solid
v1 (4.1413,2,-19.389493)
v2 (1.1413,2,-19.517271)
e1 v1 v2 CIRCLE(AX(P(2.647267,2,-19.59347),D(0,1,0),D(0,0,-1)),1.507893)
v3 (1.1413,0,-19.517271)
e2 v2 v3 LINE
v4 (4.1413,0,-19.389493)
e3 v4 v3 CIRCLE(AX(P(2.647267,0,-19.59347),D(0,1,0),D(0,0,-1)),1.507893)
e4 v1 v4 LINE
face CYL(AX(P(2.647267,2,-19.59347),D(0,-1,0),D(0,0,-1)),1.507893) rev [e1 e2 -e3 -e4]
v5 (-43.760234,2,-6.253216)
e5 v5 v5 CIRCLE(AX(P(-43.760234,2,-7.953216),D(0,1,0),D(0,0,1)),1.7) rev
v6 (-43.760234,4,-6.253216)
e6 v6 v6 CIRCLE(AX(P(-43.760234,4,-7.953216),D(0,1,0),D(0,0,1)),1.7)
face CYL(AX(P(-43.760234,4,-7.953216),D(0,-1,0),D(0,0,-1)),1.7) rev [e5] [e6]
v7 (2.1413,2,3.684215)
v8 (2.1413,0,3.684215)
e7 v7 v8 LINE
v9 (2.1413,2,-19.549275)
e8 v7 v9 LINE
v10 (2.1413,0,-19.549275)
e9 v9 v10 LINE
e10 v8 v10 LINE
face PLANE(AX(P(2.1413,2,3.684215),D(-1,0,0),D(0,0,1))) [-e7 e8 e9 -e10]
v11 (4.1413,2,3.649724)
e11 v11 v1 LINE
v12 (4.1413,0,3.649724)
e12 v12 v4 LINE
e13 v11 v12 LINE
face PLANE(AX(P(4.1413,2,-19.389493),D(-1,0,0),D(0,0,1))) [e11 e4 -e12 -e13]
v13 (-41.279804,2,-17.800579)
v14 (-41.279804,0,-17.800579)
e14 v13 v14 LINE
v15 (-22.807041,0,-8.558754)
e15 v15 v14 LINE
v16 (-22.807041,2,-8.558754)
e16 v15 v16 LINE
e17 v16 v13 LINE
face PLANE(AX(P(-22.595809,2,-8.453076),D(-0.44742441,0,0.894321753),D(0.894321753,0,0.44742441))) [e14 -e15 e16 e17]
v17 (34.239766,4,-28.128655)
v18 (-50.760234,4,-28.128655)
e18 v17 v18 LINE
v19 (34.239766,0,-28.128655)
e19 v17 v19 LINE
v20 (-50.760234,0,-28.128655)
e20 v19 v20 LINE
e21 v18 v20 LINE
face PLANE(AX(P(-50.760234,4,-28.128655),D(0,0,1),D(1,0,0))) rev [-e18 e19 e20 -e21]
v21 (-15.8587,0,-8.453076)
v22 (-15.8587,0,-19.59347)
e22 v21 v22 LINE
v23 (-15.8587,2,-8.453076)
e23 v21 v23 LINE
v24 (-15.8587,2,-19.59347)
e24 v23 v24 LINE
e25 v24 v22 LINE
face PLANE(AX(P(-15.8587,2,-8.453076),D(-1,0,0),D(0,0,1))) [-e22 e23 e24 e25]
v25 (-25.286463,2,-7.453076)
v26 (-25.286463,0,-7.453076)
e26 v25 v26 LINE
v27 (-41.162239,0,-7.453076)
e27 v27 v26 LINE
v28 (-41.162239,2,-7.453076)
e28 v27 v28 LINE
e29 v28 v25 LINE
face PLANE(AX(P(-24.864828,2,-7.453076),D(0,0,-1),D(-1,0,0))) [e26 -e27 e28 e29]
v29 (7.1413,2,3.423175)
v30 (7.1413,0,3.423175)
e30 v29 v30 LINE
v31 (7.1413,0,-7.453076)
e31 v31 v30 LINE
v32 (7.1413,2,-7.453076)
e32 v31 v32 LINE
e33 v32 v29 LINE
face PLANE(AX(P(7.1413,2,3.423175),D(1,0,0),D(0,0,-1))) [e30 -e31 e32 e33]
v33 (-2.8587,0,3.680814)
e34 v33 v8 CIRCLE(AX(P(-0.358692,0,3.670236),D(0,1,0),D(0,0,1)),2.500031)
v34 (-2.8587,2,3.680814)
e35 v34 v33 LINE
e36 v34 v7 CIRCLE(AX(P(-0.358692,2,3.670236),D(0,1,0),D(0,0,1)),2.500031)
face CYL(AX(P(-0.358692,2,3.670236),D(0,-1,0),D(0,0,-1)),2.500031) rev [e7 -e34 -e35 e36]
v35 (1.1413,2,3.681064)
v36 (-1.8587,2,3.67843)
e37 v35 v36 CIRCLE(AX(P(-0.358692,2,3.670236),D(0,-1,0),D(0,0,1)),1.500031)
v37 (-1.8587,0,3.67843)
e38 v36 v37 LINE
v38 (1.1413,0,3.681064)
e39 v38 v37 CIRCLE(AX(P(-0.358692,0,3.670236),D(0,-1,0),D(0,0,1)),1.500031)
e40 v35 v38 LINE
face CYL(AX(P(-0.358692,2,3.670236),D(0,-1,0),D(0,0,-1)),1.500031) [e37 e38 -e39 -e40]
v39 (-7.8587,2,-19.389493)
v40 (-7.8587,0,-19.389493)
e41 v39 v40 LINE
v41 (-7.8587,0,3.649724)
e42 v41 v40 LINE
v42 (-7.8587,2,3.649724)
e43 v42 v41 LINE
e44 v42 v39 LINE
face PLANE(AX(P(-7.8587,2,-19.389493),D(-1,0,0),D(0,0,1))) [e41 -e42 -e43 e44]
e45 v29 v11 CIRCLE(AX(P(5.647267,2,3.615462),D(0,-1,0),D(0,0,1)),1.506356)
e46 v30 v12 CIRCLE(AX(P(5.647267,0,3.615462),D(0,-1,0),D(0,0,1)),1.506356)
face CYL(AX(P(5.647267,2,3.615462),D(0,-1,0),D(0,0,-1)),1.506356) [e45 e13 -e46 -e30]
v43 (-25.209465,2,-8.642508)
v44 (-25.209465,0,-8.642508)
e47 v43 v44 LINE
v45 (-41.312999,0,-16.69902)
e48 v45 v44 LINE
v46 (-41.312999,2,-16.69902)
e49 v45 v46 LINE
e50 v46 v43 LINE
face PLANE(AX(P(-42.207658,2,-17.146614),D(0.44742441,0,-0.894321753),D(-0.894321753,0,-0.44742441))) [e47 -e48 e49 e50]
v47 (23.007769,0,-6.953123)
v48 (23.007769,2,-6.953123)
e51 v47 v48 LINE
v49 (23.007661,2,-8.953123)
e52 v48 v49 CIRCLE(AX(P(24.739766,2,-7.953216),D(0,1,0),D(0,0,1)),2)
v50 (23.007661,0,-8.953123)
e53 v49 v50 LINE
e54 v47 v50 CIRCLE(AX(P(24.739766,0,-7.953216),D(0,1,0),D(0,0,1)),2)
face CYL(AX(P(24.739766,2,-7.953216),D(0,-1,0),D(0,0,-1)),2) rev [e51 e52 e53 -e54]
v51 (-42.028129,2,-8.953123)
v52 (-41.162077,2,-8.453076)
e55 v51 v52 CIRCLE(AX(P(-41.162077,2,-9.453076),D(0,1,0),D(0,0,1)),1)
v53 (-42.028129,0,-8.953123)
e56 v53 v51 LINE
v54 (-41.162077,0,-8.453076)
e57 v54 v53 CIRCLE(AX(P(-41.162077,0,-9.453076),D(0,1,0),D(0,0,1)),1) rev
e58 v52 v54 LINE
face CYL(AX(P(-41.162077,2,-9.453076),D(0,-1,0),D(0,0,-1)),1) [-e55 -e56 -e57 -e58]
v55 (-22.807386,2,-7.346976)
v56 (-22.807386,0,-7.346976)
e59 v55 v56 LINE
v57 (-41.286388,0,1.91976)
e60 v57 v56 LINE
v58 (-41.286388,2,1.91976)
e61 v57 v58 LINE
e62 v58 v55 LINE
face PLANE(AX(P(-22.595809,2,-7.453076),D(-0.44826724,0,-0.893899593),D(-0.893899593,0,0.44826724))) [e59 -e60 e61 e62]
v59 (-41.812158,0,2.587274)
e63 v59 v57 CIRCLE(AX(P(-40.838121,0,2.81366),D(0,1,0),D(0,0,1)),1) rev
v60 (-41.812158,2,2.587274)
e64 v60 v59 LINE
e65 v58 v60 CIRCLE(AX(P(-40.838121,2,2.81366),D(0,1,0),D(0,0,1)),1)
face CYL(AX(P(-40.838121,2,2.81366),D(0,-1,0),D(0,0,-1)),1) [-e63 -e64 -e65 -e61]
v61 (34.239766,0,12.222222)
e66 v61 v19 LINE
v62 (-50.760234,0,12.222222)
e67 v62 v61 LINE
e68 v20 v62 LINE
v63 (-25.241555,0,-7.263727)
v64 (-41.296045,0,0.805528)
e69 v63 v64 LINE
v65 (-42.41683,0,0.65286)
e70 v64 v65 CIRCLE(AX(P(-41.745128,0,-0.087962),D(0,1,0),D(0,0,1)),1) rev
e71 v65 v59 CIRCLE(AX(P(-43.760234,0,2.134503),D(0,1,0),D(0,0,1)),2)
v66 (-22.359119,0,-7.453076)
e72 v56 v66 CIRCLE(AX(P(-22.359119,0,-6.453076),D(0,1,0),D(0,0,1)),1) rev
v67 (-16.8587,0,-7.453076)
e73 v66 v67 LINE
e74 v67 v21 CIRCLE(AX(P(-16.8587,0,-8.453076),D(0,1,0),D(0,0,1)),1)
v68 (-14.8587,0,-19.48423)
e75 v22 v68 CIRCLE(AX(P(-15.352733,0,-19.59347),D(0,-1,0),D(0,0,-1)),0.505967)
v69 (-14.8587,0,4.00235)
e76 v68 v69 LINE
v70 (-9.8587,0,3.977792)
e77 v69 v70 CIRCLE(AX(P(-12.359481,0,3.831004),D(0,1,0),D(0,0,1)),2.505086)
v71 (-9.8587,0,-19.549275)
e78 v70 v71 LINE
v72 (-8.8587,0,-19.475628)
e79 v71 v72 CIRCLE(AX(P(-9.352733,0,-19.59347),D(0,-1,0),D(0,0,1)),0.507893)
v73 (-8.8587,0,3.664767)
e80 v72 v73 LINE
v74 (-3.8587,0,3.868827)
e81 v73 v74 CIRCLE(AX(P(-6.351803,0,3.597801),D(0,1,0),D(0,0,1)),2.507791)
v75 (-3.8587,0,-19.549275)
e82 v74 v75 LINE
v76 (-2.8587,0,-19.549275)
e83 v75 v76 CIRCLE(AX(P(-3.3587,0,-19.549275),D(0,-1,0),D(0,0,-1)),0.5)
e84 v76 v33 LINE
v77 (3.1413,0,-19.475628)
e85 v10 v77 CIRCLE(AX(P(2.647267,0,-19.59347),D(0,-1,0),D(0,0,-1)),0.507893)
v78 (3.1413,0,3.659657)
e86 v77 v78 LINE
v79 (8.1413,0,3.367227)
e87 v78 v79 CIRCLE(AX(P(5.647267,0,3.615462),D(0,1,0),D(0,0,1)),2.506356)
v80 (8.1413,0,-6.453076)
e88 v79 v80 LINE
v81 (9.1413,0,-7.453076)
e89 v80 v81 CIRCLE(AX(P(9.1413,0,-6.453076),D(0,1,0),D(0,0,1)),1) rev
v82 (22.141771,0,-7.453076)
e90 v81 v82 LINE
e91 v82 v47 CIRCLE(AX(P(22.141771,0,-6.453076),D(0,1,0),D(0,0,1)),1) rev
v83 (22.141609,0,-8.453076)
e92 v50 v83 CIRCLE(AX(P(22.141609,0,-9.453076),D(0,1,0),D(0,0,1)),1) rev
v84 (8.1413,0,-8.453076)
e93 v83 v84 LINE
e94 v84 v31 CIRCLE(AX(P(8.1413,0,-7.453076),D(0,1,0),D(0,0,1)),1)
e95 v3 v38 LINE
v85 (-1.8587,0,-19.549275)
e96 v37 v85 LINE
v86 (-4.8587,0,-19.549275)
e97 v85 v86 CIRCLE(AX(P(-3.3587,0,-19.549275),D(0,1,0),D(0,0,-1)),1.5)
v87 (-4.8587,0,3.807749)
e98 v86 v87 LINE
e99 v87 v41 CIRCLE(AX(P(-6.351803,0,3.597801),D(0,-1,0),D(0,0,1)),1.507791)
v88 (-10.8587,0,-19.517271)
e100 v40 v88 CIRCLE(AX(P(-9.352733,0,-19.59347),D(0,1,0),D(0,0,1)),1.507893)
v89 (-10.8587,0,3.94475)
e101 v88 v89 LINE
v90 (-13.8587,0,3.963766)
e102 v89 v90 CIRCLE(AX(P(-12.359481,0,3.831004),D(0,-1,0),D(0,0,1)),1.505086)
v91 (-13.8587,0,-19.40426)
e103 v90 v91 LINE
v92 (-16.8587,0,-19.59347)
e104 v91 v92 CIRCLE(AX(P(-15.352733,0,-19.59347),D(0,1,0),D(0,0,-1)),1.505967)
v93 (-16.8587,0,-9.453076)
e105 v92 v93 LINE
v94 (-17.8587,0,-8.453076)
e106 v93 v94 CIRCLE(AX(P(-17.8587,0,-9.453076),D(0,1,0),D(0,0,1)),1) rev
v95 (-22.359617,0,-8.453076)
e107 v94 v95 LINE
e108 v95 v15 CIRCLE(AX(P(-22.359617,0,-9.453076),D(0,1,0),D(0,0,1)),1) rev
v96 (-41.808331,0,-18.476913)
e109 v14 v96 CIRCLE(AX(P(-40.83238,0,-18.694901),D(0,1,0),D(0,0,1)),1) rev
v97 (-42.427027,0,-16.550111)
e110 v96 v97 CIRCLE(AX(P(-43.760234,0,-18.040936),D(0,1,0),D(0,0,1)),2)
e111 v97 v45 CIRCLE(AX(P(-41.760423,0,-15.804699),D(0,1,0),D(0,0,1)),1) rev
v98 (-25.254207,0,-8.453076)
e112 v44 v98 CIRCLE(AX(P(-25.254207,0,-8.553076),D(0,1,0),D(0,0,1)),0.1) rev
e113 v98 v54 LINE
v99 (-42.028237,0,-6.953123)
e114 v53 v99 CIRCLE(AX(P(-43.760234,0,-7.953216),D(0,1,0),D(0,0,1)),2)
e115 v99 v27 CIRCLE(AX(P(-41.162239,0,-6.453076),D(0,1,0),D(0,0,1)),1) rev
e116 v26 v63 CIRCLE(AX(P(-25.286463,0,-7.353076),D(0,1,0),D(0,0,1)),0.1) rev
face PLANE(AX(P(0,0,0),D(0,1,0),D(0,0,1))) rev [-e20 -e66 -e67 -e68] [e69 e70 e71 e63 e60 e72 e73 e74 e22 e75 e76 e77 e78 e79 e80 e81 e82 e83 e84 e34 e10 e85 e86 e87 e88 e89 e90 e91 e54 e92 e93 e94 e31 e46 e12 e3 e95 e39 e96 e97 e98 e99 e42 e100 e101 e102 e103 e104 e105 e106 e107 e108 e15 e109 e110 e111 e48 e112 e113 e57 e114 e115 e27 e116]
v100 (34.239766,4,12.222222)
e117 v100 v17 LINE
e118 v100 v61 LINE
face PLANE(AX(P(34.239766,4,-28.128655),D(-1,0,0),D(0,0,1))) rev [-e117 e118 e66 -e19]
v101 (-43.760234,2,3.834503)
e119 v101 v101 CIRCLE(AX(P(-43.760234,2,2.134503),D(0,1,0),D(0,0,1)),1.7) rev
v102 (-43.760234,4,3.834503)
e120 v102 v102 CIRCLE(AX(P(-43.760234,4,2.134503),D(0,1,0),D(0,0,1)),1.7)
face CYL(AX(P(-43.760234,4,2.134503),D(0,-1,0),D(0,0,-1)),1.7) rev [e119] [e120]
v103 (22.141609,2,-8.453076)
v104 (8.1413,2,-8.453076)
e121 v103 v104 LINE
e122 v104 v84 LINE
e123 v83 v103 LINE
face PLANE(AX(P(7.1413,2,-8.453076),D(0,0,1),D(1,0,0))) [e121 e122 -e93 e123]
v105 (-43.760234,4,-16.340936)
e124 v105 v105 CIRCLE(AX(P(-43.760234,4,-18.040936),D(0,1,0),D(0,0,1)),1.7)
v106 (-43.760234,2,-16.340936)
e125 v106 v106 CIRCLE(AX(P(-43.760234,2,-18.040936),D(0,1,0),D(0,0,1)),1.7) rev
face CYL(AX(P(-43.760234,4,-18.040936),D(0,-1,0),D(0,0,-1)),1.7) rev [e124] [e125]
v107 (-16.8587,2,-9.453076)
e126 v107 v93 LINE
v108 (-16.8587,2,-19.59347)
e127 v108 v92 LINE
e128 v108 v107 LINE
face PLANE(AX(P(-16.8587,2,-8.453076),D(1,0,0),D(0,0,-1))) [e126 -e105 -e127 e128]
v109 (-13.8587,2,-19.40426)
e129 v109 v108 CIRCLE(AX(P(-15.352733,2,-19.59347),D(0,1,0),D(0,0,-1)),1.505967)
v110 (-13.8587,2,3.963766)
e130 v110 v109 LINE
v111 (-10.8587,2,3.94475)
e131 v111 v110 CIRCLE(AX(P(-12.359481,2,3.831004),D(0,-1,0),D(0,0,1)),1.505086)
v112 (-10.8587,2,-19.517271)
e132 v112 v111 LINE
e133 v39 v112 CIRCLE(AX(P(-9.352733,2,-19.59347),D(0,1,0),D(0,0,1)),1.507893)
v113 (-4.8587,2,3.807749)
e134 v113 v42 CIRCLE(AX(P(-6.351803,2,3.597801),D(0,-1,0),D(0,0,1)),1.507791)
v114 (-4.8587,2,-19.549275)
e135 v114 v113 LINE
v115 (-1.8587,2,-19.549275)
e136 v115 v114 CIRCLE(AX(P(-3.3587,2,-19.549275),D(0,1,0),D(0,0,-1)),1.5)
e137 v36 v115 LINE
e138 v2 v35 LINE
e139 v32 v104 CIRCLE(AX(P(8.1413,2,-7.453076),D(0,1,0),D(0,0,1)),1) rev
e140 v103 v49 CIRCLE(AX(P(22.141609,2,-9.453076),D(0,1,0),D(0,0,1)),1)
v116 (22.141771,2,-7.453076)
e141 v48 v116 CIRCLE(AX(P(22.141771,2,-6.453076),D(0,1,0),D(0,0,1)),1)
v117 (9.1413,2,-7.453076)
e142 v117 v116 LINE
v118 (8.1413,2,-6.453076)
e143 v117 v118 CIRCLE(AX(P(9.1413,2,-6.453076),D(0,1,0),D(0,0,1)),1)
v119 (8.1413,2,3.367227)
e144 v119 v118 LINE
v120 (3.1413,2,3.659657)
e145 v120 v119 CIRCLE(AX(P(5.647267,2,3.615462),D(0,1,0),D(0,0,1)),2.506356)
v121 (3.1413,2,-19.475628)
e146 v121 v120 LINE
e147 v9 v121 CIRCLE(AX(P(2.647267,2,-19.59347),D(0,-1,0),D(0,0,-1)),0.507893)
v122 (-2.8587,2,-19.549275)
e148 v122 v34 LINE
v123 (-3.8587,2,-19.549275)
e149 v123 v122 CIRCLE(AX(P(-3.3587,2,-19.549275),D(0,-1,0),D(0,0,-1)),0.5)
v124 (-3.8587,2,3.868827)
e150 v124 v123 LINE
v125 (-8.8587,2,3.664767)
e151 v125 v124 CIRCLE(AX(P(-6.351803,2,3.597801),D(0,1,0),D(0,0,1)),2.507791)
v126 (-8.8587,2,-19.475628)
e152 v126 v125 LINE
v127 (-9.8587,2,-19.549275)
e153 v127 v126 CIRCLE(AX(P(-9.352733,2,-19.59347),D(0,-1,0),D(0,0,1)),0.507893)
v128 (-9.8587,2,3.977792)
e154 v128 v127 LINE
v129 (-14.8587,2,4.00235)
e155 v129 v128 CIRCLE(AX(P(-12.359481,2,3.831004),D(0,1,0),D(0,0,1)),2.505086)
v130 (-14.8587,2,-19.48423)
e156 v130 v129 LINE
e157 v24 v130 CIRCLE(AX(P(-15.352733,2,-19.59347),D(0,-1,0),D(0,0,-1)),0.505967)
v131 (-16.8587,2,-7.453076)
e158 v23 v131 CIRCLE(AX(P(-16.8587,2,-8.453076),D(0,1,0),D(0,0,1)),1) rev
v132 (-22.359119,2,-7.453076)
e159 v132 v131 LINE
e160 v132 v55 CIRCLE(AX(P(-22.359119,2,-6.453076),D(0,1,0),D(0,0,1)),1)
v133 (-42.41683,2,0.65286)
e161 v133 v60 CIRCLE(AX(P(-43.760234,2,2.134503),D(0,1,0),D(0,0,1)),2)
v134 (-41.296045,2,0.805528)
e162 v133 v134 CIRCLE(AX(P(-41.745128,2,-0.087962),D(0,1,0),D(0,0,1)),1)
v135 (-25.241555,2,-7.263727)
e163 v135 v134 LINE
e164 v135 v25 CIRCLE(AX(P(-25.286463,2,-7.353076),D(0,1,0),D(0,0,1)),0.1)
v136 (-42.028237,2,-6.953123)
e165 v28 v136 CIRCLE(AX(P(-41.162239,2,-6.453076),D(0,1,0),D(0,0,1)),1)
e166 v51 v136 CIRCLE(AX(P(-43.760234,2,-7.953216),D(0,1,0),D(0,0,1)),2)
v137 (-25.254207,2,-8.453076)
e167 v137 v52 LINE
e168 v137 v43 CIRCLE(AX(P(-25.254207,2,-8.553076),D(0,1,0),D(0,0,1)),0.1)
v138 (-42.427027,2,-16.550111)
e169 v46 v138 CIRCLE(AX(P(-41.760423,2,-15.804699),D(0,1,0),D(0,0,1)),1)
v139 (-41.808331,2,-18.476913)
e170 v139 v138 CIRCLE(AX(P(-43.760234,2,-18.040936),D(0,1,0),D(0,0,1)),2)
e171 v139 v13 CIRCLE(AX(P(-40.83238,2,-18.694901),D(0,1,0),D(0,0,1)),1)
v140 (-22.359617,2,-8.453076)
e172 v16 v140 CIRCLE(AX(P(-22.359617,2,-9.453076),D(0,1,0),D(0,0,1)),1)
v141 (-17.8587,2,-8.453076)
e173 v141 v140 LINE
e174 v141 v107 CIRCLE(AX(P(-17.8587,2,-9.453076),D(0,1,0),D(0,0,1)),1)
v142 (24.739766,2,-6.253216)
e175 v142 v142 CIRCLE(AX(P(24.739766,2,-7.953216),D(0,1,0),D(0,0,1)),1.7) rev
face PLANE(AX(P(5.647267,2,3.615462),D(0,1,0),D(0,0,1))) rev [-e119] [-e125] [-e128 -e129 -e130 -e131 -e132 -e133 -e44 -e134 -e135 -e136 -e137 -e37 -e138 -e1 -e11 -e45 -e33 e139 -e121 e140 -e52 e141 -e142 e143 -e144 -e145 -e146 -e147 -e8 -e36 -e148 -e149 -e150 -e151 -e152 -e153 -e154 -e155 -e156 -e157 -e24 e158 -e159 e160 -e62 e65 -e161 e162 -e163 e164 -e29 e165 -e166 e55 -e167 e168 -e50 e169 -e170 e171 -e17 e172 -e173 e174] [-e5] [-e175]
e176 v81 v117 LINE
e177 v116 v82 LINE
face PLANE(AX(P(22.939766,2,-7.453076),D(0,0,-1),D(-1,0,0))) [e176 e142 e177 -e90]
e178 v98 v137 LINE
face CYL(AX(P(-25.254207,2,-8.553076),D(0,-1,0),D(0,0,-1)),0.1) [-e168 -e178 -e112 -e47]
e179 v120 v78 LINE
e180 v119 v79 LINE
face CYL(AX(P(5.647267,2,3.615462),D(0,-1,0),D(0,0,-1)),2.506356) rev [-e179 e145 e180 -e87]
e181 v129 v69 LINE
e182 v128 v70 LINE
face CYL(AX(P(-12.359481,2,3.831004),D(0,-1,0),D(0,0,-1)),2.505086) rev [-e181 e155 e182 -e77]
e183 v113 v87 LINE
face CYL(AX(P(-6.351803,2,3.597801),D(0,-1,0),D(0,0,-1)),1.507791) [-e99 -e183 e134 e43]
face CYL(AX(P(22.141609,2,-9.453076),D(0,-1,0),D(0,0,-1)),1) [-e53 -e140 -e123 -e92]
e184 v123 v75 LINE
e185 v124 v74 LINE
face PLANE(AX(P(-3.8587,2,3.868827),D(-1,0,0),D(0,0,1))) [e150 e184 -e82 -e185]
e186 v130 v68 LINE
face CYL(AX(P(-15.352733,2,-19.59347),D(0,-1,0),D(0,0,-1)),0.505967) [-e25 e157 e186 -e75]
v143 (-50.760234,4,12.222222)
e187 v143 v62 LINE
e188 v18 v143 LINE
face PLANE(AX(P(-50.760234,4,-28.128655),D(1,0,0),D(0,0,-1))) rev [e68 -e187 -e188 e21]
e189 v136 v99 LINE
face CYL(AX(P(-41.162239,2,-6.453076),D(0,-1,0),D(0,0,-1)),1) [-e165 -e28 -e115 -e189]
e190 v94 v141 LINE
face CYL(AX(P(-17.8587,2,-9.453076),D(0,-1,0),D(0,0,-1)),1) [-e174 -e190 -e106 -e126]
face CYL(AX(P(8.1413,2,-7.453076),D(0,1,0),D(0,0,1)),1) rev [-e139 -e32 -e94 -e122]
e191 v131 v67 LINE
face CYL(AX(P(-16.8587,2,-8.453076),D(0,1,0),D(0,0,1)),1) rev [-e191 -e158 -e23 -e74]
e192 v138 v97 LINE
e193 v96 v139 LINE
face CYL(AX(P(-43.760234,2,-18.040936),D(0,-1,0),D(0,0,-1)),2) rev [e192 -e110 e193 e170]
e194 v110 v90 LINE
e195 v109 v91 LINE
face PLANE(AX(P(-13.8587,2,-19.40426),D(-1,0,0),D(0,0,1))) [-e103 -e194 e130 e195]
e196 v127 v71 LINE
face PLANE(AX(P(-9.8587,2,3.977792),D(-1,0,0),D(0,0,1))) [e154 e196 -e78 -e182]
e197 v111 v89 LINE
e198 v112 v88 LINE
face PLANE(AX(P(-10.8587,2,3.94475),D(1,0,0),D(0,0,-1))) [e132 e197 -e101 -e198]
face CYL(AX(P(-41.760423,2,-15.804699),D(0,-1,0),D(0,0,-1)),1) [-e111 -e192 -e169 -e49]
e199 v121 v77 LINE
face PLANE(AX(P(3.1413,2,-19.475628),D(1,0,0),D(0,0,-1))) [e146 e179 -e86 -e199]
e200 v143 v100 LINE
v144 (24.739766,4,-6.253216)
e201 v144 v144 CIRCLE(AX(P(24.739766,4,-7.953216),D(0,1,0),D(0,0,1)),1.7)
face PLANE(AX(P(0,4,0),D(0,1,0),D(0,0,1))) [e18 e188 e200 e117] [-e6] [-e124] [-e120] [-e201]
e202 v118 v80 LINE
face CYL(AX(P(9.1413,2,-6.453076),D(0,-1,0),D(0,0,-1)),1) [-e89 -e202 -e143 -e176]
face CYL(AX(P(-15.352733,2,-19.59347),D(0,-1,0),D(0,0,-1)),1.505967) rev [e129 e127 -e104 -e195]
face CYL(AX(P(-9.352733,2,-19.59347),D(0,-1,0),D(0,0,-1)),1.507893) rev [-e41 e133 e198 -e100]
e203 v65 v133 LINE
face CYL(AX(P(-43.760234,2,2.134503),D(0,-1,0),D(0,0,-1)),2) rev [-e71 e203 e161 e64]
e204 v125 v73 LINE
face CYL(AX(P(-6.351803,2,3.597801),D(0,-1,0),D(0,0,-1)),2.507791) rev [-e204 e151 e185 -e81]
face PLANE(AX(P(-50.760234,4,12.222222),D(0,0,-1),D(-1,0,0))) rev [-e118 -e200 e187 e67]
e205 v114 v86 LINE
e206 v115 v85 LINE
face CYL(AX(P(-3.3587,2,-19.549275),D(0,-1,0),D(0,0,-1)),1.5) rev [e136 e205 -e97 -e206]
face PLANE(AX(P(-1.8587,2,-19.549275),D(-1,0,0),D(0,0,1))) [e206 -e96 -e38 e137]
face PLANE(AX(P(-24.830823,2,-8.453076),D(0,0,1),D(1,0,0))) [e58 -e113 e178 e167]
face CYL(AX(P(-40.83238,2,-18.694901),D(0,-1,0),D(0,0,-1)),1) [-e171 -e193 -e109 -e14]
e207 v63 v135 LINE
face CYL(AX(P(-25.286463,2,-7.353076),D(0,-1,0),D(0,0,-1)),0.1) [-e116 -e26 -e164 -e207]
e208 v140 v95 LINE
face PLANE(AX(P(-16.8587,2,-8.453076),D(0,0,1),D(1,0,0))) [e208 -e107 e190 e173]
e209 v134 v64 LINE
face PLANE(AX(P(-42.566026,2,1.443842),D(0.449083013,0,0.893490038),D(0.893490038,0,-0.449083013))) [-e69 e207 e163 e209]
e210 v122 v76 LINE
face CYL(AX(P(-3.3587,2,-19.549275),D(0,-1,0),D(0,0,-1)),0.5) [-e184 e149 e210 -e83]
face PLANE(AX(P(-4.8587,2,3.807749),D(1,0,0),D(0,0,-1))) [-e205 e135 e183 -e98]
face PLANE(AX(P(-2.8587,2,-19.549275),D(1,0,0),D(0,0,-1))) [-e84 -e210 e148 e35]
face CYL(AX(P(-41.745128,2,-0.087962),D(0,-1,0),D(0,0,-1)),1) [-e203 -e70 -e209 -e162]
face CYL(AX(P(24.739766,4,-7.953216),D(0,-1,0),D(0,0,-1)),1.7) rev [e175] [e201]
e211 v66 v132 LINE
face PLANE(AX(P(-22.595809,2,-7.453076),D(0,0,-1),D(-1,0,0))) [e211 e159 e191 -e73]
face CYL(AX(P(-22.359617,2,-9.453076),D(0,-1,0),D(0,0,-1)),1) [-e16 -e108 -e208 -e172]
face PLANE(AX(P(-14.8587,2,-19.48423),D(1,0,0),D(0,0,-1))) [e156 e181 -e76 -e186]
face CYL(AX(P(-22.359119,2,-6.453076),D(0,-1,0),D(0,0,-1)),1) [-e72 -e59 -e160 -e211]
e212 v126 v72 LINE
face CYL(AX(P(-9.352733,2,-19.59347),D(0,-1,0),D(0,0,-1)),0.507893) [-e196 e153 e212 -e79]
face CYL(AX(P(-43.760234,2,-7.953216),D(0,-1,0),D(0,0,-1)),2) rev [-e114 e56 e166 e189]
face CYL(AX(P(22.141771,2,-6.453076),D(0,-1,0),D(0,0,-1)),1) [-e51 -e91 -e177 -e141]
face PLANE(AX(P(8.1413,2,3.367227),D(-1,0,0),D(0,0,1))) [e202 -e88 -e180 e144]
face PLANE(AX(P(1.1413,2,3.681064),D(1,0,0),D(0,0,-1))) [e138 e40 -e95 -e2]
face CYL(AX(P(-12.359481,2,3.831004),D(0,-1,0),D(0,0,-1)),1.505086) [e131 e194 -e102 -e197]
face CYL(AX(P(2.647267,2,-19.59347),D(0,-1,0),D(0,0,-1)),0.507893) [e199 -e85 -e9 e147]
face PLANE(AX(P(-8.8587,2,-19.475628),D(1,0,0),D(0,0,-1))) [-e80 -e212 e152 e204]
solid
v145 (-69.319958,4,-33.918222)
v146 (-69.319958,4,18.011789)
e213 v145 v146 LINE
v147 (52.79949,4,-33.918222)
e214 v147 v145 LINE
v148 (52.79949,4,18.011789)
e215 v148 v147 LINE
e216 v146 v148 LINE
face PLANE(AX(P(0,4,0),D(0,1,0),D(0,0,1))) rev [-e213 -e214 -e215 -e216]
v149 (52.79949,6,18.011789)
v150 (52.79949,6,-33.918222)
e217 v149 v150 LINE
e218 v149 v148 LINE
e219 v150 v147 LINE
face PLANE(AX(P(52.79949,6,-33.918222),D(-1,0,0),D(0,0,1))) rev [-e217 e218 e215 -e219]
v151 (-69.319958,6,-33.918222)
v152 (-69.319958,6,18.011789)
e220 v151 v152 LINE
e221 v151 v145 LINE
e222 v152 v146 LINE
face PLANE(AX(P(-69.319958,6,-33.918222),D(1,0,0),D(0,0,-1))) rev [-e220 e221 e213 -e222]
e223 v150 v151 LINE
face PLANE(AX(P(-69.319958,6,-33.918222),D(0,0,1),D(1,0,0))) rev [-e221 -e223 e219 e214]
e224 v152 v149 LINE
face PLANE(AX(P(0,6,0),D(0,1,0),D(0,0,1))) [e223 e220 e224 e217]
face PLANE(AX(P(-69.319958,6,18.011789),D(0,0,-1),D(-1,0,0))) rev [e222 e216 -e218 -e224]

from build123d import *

# Parameters (mm, degrees)
SKETCH_2_W           = 85
SKETCH_2_H           = 40.350877193
EXTRUDE_2_DEPTH      = 4
CUT_EXTRUDE_9_DEPTH  = 2
SKETCH_4_R           = 2
CUT_EXTRUDE_13_DEPTH = 2
SKETCH_8_R           = 2
CUT_EXTRUDE_14_DEPTH = 2
SKETCH_9_R           = 1.7
CUT_EXTRUDE_15_DEPTH = 4
FILLET_6_R           = 1
FILLET_9_R           = 50
FILLET_11_R          = 1
FILLET_12_R          = 1
FILLET_13_R          = 1
FILLET_14_R          = 1
FILLET_15_R          = 1
FILLET_16_R          = 1
FILLET_17_R          = 1
FILLET_18_R          = 1
FILLET_19_R          = 1
FILLET_23_R          = 0.1
FILLET_24_R          = 0.1
FILLET_25_R          = 1
FILLET_26_R          = 1
FILLET_27_R          = 1
FILLET_28_R          = 1
SKETCH_11_W          = 122.119447846
SKETCH_11_H          = 51.930010933
EXTRUDE_4_DEPTH      = 2


with BuildPart() as part:
    # 草图2 → 凸台-拉伸2 (new body)
    with BuildSketch(Plane(origin=(0, 0, 0), x_dir=(1, 0, 0), z_dir=(0, 1, 0))):
        with Locations((-8.260233918, 7.953216375)):
            Rectangle(SKETCH_2_W, SKETCH_2_H)
    extrude(amount=EXTRUDE_2_DEPTH)

    # 草图3 → 切除-拉伸9 (cut)
    with BuildSketch(Plane(origin=(0, 0, 0), x_dir=(1, 0, 0), z_dir=(0, 1, 0))):
        with BuildLine():
            Line((7.141300063, -3.423174679), (7.141300063, 7.953075954))
            Line((7.141300063, 7.953075954), (7.141300063, 8.453075954))
            Line((7.141300063, 8.453075954), (22.939766082, 8.453075954))
            Line((22.939766082, 8.453075954), (22.939766082, 7.453075954))
            Line((22.939766082, 7.453075954), (8.332708966, 7.453075954))
            Line((8.332708966, 7.453075954), (8.141300063, 7.453075954))
            Line((8.141300063, 7.453075954), (8.141300063, -3.367226613))
            ThreePointArc((8.141300063, -3.367226613), (5.793603892, -6.117542647), (3.141300063, -3.659657378))
            Line((3.141300063, -3.659657378), (3.141300063, 19.475628159))
            ThreePointArc((3.141300063, 19.475628159), (2.684570377, 20.099991696), (2.141300063, 19.54927471))
            Line((2.141300063, 19.54927471), (2.141300063, -3.684214987))
            ThreePointArc((2.141300063, -3.684214987), (-0.360392065, -6.170265877), (-2.858699937, -3.680814068))
            Line((-2.858699937, -3.680814068), (-2.858699937, 19.54927471))
            ThreePointArc((-2.858699937, 19.54927471), (-3.358699937, 20.04927471), (-3.858699937, 19.54927471))
            Line((-3.858699937, 19.54927471), (-3.858699937, -3.868826578))
            ThreePointArc((-3.858699937, -3.868826578), (-6.45406539, -6.103506829), (-8.858699937, -3.664767327))
            Line((-8.858699937, -3.664767327), (-8.858699937, 19.475628159))
            ThreePointArc((-8.858699937, 19.475628159), (-9.315429623, 20.099991696), (-9.858699937, 19.54927471))
            Line((-9.858699937, 19.54927471), (-9.858699937, -3.977792488))
            ThreePointArc((-9.858699937, -3.977792488), (-12.347177567, -6.336059123), (-14.858699937, -4.002350096))
            Line((-14.858699937, -4.002350096), (-14.858699937, 19.484229611))
            ThreePointArc((-14.858699937, 19.484229611), (-15.297787958, 20.096444716), (-15.858699937, 19.593470188))
            Line((-15.858699937, 19.593470188), (-15.858699937, 8.453075954))
            Line((-15.858699937, 8.453075954), (-15.858699937, 7.453075954))
            Line((-15.858699937, 7.453075954), (-22.595809003, 7.453075954))
            Line((-22.595809003, 7.453075954), (-41.760233918, -2.157381342))
            Line((-41.760233918, -2.157381342), (-42.566026343, -1.44384175))
            Line((-42.566026343, -1.44384175), (-24.864828341, 7.453075954))
            Line((-24.864828341, 7.453075954), (-42.564621955, 7.453075954))
            Line((-42.564621955, 7.453075954), (-42.564621955, 8.453075954))
            Line((-42.564621955, 8.453075954), (-24.830823405, 8.453075954))
            Line((-24.830823405, 8.453075954), (-42.207658328, 17.14661392))
            Line((-42.207658328, 17.14661392), (-41.760233918, 18.040935673))
            Line((-41.760233918, 18.040935673), (-22.595809003, 8.453075954))
            Line((-22.595809003, 8.453075954), (-16.858699937, 8.453075954))
            Line((-16.858699937, 8.453075954), (-16.858699937, 19.593470188))
            ThreePointArc((-16.858699937, 19.593470188), (-15.257940096, 21.096450602), (-13.858699937, 19.404259958))
            Line((-13.858699937, 19.404259958), (-13.858699937, -3.963766104))
            ThreePointArc((-13.858699937, -3.963766104), (-12.349941217, -5.336059103), (-10.858699937, -3.944750225))
            Line((-10.858699937, -3.944750225), (-10.858699937, 19.517270996))
            ThreePointArc((-10.858699937, 19.517270996), (-9.288566003, 21.099997568), (-7.858699937, 19.38949267))
            Line((-7.858699937, 19.38949267), (-7.858699937, -3.649723614))
            ThreePointArc((-7.858699937, -3.649723614), (-6.431116121, -5.10350525), (-4.858699937, -3.807749123))
            Line((-4.858699937, -3.807749123), (-4.858699937, 19.54927471))
            ThreePointArc((-4.858699937, 19.54927471), (-3.358699937, 21.04927471), (-1.858699937, 19.54927471))
            Line((-1.858699937, 19.54927471), (-1.858699937, -3.678429695))
            ThreePointArc((-1.858699937, -3.678429695), (-0.360008779, -5.170265877), (1.141300063, -3.681064031))
            Line((1.141300063, -3.681064031), (1.141300063, 19.517270996))
            ThreePointArc((1.141300063, 19.517270996), (2.711433997, 21.099997568), (4.141300063, 19.38949267))
            Line((4.141300063, 19.38949267), (4.141300063, -3.649723614))
            ThreePointArc((4.141300063, -3.649723614), (5.760698323, -5.117541465), (7.141300063, -3.423174679))
        make_face()
    extrude(amount=CUT_EXTRUDE_9_DEPTH, mode=Mode.SUBTRACT)

    # 草图4 → 切除-拉伸13 (cut)
    with BuildSketch(Plane(origin=(0, 0, 0), x_dir=(1, 0, 0), z_dir=(0, 1, 0))):
        with Locations((-43.760233918, 18.040935673)):
            Circle(SKETCH_4_R)
        with Locations((-43.760233918, 7.953216374)):
            Circle(SKETCH_4_R)
        with Locations((-43.760233918, -2.134502924)):
            Circle(SKETCH_4_R)
    extrude(amount=CUT_EXTRUDE_13_DEPTH, mode=Mode.SUBTRACT)

    # 草图8 → 切除-拉伸14 (cut)
    with BuildSketch(Plane(origin=(0, 0, 0), x_dir=(1, 0, 0), z_dir=(0, 1, 0))):
        with Locations((24.739766082, 7.953216374)):
            Circle(SKETCH_8_R)
    extrude(amount=CUT_EXTRUDE_14_DEPTH, mode=Mode.SUBTRACT)

    # 草图9 → 切除-拉伸15 (cut)
    with BuildSketch(Plane(origin=(0, 0, 0), x_dir=(1, 0, 0), z_dir=(0, 1, 0))):
        with Locations(Location((-43.760233918, 18.040935673, 0), (0, 0, 270))):
            Circle(SKETCH_9_R)
        with Locations(Location((-43.760233918, 7.953216374, 0), (0, 0, 270))):
            Circle(SKETCH_9_R)
        with Locations(Location((-43.760233918, -2.134502924, 0), (0, 0, 270))):
            Circle(SKETCH_9_R)
        with Locations(Location((24.739766082, 7.953216374, 0), (0, 0, 270))):
            Circle(SKETCH_9_R)
    extrude(amount=CUT_EXTRUDE_15_DEPTH, mode=Mode.SUBTRACT)

    # 圆角6
    fillet_6_edges = [part.edges().sort_by_distance(p)[0] for p in [
        (-42.010998928, 1, 1.164875703),
    ]]
    fillet(fillet_6_edges, radius=FILLET_6_R)

    # 圆角9
    # the kernel refuses this fillet: 50 mm, written as the material it adds along each edge
    with BuildSketch(Plane(origin=(-41.760233918, 0, 2.157381342), x_dir=(-0.7486630061639391, 0, -0.6629507547333918), z_dir=(0, 1, 0))) as fillet_9_piece_1:
        with BuildLine():
            CenterArc((46.363497209, -18.720100753), FILLET_9_R, 158.012641456, 0.145228932)
            Line((-0.047128239, -0.117578196), (0, 0))
            Line((0, 0), (0.000173043, 0))
        make_face()
    extrude(amount=2.316679088)

    # 圆角11
    fillet_11_edges = [part.edges().sort_by_distance(p)[0] for p in [
        (-41.760363469, 1, 2.157266623),
    ]]
    fillet(fillet_11_edges, radius=FILLET_11_R)

    # 圆角12
    fillet_12_edges = [part.edges().sort_by_distance(p)[0] for p in [
        (22.80331067, 1, -7.453075954),
    ]]
    fillet(fillet_12_edges, radius=FILLET_12_R)

    # 圆角13
    fillet_13_edges = [part.edges().sort_by_distance(p)[0] for p in [
        (22.803238158, 1, -8.453075954),
    ]]
    fillet(fillet_13_edges, radius=FILLET_13_R)

    # 圆角14
    fillet_14_edges = [part.edges().sort_by_distance(p)[0] for p in [
        (8.141300063, 1, -7.453075954),
    ]]
    fillet(fillet_14_edges, radius=FILLET_14_R)

    # 圆角15
    fillet_15_edges = [part.edges().sort_by_distance(p)[0] for p in [
        (7.141300063, 1, -8.453075954),
    ]]
    fillet(fillet_15_edges, radius=FILLET_15_R)

    # 圆角16
    fillet_16_edges = [part.edges().sort_by_distance(p)[0] for p in [
        (-16.858699937, 1, -8.453075954),
    ]]
    fillet(fillet_16_edges, radius=FILLET_16_R)

    # 圆角17
    fillet_17_edges = [part.edges().sort_by_distance(p)[0] for p in [
        (-15.858699937, 1, -7.453075954),
    ]]
    fillet(fillet_17_edges, radius=FILLET_17_R)

    # 圆角18
    fillet_18_edges = [part.edges().sort_by_distance(p)[0] for p in [
        (-22.595809003, 1, -8.453075954),
    ]]
    fillet(fillet_18_edges, radius=FILLET_18_R)

    # 圆角19
    fillet_19_edges = [part.edges().sort_by_distance(p)[0] for p in [
        (-22.595809003, 1, -7.453075954),
    ]]
    fillet(fillet_19_edges, radius=FILLET_19_R)

    # 圆角23
    fillet_23_edges = [part.edges().sort_by_distance(p)[0] for p in [
        (-24.864828341, 1, -7.453075954),
    ]]
    fillet(fillet_23_edges, radius=FILLET_23_R)

    # 圆角24
    fillet_24_edges = [part.edges().sort_by_distance(p)[0] for p in [
        (-24.830823405, 1, -8.453075954),
    ]]
    fillet(fillet_24_edges, radius=FILLET_24_R)

    # 圆角25
    fillet_25_edges = [part.edges().sort_by_distance(p)[0] for p in [
        (-41.760233918, 1, -18.040935673),
    ]]
    fillet(fillet_25_edges, radius=FILLET_25_R)

    # 圆角26
    fillet_26_edges = [part.edges().sort_by_distance(p)[0] for p in [
        (-42.021111406, 1, -17.053285488),
    ]]
    fillet(fillet_26_edges, radius=FILLET_26_R)

    # 圆角27
    fillet_27_edges = [part.edges().sort_by_distance(p)[0] for p in [
        (-41.823705994, 1, -8.453075954),
    ]]
    fillet(fillet_27_edges, radius=FILLET_27_R)

    # 圆角28
    fillet_28_edges = [part.edges().sort_by_distance(p)[0] for p in [
        (-41.823778507, 1, -7.453075954),
    ]]
    fillet(fillet_28_edges, radius=FILLET_28_R)


with BuildPart() as body_2:
    # 草图11 → 凸台-拉伸4 (new body)
    with BuildSketch(Plane(origin=(0, 4, 0), x_dir=(1, 0, 0), z_dir=(0, 1, 0))):
        with Locations((-8.260233918, 7.953216375)):
            Rectangle(SKETCH_11_W, SKETCH_11_H)
    extrude(amount=EXTRUDE_4_DEPTH)


solid = Compound([part.part, body_2.part])
